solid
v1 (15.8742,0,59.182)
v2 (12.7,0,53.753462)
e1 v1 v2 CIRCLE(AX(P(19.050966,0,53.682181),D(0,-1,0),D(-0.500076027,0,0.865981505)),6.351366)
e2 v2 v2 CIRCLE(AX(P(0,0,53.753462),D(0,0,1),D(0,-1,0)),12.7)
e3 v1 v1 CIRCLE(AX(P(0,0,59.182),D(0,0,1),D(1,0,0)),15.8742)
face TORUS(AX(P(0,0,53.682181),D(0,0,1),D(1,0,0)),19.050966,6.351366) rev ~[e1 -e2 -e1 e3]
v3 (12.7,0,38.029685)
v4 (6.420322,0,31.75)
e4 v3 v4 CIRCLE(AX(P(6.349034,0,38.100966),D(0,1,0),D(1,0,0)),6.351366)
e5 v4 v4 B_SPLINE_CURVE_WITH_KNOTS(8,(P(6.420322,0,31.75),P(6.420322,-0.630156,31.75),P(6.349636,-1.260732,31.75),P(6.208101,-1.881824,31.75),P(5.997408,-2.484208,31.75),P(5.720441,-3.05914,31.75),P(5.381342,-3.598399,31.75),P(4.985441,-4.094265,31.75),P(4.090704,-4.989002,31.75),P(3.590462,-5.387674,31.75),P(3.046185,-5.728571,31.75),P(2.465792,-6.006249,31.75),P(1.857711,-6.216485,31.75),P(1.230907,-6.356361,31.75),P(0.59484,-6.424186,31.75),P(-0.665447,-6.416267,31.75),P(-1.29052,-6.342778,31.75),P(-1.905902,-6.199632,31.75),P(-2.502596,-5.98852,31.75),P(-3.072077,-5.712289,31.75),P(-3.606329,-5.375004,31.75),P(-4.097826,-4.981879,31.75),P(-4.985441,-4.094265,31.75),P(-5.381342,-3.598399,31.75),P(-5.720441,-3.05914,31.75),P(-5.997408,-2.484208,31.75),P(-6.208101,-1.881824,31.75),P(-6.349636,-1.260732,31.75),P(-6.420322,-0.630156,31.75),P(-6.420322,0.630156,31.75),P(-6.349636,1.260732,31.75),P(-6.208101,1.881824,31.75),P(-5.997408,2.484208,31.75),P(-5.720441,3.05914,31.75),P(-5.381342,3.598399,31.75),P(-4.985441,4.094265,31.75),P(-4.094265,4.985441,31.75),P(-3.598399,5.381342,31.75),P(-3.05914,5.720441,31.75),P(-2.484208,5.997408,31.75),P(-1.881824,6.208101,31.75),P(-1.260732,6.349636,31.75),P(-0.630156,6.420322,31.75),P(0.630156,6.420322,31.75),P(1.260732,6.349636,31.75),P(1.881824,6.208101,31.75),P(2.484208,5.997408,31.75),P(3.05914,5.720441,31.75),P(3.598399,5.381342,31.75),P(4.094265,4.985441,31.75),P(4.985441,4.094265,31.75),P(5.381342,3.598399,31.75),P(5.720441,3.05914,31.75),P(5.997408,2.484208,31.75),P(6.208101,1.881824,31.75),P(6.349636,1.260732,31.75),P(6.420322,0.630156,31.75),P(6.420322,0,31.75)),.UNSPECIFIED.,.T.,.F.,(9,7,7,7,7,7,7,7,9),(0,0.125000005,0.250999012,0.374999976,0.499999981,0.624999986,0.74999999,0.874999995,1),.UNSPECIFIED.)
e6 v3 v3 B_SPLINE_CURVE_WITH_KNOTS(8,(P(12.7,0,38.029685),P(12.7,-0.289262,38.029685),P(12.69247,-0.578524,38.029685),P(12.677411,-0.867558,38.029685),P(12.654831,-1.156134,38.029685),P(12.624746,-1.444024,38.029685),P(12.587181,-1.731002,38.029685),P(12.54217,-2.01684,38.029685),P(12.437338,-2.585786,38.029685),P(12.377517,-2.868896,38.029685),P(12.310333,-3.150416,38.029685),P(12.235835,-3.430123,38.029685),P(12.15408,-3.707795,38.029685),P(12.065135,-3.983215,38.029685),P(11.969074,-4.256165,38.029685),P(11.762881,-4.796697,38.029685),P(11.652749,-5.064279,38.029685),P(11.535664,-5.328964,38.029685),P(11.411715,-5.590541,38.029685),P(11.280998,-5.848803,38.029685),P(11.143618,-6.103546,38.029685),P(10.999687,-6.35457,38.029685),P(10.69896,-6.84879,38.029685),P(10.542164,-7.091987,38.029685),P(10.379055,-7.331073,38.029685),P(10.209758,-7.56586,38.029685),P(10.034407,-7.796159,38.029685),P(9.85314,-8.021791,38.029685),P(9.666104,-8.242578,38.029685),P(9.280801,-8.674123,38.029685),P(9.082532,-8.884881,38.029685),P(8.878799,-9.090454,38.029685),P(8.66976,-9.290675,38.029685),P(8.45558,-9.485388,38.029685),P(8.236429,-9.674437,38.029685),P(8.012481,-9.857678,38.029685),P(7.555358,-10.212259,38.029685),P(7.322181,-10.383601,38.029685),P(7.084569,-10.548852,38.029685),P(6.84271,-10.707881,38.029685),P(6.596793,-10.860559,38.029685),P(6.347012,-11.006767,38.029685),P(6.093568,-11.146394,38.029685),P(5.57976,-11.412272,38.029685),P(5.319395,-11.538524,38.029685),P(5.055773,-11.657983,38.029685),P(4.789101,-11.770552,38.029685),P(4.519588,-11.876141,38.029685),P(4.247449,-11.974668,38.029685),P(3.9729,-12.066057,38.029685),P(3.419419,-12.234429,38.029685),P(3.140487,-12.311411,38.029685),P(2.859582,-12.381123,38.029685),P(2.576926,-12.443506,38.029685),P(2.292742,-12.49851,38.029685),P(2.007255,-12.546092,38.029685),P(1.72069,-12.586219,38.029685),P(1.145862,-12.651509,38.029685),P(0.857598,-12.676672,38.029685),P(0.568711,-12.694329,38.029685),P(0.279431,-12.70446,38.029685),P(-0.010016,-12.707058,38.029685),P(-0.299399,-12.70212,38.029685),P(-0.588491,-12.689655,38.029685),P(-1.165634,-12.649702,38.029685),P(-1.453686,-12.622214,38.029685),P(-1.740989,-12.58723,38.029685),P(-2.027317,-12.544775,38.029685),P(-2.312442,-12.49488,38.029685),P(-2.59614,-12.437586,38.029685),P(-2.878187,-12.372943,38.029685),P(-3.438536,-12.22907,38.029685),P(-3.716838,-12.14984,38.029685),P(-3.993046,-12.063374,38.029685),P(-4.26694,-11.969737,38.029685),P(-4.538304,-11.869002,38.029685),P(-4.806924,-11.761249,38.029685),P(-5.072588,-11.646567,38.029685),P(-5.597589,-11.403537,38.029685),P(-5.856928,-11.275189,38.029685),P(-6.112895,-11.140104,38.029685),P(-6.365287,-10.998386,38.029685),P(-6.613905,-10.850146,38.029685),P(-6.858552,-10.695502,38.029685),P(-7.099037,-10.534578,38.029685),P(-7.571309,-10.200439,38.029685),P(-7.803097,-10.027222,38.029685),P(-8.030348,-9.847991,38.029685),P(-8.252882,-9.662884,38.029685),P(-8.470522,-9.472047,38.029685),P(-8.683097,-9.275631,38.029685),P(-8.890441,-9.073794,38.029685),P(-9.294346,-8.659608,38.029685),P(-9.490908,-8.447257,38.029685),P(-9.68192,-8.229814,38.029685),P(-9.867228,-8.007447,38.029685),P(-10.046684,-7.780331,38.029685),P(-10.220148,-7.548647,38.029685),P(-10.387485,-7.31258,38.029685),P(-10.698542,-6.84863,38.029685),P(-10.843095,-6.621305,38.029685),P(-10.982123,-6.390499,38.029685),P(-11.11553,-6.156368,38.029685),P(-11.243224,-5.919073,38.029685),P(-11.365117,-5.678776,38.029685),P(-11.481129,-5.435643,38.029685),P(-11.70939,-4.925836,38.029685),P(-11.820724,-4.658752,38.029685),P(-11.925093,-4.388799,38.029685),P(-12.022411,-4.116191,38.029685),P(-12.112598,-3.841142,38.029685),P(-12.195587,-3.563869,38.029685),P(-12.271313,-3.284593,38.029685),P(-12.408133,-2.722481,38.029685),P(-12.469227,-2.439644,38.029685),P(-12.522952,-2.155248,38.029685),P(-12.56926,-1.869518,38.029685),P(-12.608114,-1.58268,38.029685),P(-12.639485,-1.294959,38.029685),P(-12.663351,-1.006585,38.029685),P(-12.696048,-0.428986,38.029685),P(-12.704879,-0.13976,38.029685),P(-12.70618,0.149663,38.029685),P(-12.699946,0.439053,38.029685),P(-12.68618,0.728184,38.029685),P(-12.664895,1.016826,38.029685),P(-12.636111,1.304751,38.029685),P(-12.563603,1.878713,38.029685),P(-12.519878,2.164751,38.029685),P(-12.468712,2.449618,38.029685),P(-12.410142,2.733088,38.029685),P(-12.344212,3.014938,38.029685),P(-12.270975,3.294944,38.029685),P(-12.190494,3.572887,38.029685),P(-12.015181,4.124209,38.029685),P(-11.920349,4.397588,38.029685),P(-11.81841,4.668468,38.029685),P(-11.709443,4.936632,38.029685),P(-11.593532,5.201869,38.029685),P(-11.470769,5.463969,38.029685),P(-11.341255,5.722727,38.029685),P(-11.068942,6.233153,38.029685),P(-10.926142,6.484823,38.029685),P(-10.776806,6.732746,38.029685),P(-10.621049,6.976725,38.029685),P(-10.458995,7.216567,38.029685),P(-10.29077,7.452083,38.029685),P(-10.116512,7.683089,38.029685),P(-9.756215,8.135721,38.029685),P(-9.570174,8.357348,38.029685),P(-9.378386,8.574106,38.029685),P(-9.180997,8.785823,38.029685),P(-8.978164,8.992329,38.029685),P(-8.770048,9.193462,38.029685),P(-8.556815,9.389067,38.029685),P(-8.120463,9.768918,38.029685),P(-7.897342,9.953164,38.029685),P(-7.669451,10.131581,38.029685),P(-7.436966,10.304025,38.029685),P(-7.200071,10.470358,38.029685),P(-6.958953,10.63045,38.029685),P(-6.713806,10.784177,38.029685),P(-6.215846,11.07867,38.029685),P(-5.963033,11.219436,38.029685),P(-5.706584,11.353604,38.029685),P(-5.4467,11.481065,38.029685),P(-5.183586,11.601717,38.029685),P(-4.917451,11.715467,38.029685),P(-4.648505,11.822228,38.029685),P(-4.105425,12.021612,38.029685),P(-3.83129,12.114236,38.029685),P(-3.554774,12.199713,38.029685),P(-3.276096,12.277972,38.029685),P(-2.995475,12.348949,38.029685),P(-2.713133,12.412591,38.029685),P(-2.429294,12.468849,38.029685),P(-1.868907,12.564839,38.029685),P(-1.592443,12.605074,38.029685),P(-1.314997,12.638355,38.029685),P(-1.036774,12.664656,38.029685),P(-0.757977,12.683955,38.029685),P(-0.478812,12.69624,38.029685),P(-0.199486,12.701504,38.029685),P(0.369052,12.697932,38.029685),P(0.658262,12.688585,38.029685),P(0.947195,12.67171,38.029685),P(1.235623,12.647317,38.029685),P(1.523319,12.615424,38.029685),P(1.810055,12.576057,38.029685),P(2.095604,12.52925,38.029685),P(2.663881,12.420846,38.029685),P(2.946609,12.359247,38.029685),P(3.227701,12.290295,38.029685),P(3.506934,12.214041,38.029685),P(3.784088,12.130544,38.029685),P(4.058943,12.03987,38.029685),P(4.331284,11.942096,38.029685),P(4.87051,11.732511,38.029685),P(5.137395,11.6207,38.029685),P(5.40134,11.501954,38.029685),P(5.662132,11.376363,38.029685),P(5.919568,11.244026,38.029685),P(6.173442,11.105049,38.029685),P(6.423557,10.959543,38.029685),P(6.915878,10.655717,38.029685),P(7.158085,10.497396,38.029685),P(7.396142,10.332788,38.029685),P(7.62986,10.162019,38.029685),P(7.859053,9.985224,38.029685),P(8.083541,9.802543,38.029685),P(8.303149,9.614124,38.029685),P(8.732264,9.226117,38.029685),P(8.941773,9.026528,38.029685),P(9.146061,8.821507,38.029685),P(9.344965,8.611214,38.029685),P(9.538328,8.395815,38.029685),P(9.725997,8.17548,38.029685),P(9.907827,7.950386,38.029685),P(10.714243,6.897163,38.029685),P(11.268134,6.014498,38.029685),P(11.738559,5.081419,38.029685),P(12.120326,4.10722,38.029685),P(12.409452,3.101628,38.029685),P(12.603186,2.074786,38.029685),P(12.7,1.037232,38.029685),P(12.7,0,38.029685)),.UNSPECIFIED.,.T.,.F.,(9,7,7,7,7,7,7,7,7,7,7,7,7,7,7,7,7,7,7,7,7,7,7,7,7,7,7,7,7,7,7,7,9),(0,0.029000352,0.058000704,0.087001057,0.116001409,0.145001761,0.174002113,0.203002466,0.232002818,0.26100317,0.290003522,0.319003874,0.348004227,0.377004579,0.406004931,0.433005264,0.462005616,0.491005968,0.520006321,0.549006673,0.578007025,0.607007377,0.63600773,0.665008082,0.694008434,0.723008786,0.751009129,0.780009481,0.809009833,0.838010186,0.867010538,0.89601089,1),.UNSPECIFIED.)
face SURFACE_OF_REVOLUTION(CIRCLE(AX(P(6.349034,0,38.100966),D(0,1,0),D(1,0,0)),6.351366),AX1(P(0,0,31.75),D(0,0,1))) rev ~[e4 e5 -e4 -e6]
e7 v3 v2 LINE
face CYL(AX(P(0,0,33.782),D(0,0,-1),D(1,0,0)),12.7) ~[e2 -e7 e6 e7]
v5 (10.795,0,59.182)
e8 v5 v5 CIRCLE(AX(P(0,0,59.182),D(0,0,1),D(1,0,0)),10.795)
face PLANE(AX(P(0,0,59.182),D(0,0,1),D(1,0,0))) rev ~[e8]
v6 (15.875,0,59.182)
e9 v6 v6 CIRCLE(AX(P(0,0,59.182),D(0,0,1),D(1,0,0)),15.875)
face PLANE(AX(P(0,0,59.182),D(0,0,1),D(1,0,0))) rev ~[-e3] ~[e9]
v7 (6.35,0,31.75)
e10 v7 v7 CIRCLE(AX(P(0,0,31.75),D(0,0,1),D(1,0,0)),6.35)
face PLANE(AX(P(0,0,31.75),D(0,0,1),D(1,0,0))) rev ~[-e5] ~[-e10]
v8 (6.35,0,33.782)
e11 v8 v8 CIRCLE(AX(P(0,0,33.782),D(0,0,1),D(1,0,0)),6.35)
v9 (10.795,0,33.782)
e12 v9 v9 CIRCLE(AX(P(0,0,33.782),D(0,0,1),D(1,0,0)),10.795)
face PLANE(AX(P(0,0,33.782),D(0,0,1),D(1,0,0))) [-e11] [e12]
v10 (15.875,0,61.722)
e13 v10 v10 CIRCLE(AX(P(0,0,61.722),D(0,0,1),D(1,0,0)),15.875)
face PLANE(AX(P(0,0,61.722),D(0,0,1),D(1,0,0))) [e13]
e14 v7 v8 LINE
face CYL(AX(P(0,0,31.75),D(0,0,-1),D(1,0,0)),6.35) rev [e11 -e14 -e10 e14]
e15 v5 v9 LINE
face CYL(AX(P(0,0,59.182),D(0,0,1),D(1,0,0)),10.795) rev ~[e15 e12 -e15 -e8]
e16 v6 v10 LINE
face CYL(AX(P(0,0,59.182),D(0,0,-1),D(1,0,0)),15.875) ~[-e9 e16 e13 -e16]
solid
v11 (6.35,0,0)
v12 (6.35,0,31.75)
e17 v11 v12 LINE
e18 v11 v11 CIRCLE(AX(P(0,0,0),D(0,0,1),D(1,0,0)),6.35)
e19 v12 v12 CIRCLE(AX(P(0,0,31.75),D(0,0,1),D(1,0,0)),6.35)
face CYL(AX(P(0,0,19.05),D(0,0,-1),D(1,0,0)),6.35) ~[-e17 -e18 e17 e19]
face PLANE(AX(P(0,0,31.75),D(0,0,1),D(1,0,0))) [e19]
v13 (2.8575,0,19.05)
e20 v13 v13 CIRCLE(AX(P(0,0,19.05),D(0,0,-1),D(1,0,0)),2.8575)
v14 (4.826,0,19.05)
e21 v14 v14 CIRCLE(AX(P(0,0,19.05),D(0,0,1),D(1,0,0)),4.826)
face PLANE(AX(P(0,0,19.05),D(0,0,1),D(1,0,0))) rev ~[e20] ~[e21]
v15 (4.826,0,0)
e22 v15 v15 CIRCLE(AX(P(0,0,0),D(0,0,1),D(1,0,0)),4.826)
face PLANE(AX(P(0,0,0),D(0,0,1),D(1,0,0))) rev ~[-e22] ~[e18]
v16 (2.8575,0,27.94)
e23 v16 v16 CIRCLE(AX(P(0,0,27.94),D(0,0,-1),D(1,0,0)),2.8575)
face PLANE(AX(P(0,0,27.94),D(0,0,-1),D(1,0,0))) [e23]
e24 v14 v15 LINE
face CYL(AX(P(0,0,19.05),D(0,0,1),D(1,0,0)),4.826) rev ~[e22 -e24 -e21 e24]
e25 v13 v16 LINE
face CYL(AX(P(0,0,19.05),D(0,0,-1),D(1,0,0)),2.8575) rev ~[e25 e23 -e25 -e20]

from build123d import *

# Parameters (mm, degrees)
F0_R      = 6.35
F1_DEPTH  = 19.05
F2_R      = 4.826
F3_DEPTH  = 19.051
F4_R      = 6.35
F5_DEPTH  = 12.7
F6_R      = 2.8575
F7_DEPTH  = 8.89
F8_R      = 12.7
F8_R_2    = 6.35
F9_DEPTH  = 2.032
F10_R     = 12.7
F11_DEPTH = 25.4
F12_R     = 10.795
F13_DEPTH = 25.4
F14_R     = 15.875
F15_DEPTH = 2.54


# Not quite as in the source:
# - a fillet or chamfer that OpenCascade refuses, or shapes differently, is made with other operations: its cross-section is extruded or revolved along the edge and cut away or added


with BuildPart() as f1:
    # F0 (on Top) → F1 (new body)
    with BuildSketch(Plane.XY):
        Circle(F0_R)
    extrude(amount=F1_DEPTH)

    # F2 (on face) → F3 (cut, through all)
    with BuildSketch(Plane.XY.offset(19.05)):
        Circle(F2_R)
    extrude(amount=-F3_DEPTH, mode=Mode.SUBTRACT)

    # F4 (on face) → F5 (join)
    with BuildSketch(Plane.XY.offset(19.05)):
        Circle(F4_R)
    extrude(amount=F5_DEPTH)

    # F6 (on face) → F7 (cut)
    with BuildSketch(Plane(origin=(0, 0, 19.05), x_dir=(1, 0, 0), z_dir=(0, 0, -1))):
        Circle(F6_R)
    extrude(amount=-F7_DEPTH, mode=Mode.SUBTRACT)


with BuildPart() as f9:
    # F8 (on face) → F9 (new body)
    with BuildSketch(Plane.XY.offset(31.75)):
        Circle(F8_R)
        Circle(F8_R_2, mode=Mode.SUBTRACT)
    extrude(amount=F9_DEPTH)

    # F10 (on face) → F11 (join)
    with BuildSketch(Plane.XY.offset(33.782)):
        Circle(F10_R)
    extrude(amount=F11_DEPTH)

    # F12 (on face) → F13 (cut)
    with BuildSketch(Plane.XY.offset(59.182)):
        Circle(F12_R)
    extrude(amount=-F13_DEPTH, mode=Mode.SUBTRACT)

    # F14 (on face) → F15 (join)
    with BuildSketch(Plane.XY.offset(59.182)):
        Circle(F14_R)
    extrude(amount=F15_DEPTH)

    # F16: fillet of radius 6.35 on 3 edges, made by hand

    # F16_s1 → F16_t2 (revolve)
    with BuildSketch(Plane.XZ):
        with BuildLine():
            ThreePointArc((15.8747999696, 59.1823463926), (13.5503822614, 56.8576225725), (12.6996, 53.6821811755))
            Line((12.6996, 53.6821811755), (12.0644634315, 53.6821811755))
            ThreePointArc((12.0644634315, 53.6821811755), (12.0648634315, 56.4320905877), (12.0648634315, 59.182))
            Line((12.0648634315, 59.182), (12.7, 59.8171365685))
            ThreePointArc((12.7, 59.8171365685), (14.2873999848, 59.8171365685), (15.557183398, 59.7323629143))
            Line((15.557183398, 59.7323629143), (15.8747999696, 59.1823463926))
        make_face()
    revolve(axis=Axis((0, 0, 59.182), (0, 0, 1)))

    # F16_s3 → F16_t4 (revolve, cut)
    with BuildSketch(Plane.XZ):
        with BuildLine():
            ThreePointArc((12.7004, 38.100965612), (10.8404694904, 33.6102133219), (6.3500000608, 31.7496))
            Line((6.3500000608, 31.7496), (6.3500966354, 31.1144634388))
            ThreePointArc((6.3500966354, 31.1144634388), (9.5250000304, 31.1148634315), (12.7, 31.1148634315))
            Line((12.7, 31.1148634315), (13.3351365685, 31.75))
            ThreePointArc((13.3351365685, 31.75), (13.3351365685, 34.925482806), (13.3355365685, 38.100965612))
            Line((13.3355365685, 38.100965612), (12.7004, 38.100965612))
        make_face()
    revolve(axis=Axis((0, 0, 31.75), (0, 0, 1)), mode=Mode.SUBTRACT)


solid = Compound([f1.part, f9.part])
